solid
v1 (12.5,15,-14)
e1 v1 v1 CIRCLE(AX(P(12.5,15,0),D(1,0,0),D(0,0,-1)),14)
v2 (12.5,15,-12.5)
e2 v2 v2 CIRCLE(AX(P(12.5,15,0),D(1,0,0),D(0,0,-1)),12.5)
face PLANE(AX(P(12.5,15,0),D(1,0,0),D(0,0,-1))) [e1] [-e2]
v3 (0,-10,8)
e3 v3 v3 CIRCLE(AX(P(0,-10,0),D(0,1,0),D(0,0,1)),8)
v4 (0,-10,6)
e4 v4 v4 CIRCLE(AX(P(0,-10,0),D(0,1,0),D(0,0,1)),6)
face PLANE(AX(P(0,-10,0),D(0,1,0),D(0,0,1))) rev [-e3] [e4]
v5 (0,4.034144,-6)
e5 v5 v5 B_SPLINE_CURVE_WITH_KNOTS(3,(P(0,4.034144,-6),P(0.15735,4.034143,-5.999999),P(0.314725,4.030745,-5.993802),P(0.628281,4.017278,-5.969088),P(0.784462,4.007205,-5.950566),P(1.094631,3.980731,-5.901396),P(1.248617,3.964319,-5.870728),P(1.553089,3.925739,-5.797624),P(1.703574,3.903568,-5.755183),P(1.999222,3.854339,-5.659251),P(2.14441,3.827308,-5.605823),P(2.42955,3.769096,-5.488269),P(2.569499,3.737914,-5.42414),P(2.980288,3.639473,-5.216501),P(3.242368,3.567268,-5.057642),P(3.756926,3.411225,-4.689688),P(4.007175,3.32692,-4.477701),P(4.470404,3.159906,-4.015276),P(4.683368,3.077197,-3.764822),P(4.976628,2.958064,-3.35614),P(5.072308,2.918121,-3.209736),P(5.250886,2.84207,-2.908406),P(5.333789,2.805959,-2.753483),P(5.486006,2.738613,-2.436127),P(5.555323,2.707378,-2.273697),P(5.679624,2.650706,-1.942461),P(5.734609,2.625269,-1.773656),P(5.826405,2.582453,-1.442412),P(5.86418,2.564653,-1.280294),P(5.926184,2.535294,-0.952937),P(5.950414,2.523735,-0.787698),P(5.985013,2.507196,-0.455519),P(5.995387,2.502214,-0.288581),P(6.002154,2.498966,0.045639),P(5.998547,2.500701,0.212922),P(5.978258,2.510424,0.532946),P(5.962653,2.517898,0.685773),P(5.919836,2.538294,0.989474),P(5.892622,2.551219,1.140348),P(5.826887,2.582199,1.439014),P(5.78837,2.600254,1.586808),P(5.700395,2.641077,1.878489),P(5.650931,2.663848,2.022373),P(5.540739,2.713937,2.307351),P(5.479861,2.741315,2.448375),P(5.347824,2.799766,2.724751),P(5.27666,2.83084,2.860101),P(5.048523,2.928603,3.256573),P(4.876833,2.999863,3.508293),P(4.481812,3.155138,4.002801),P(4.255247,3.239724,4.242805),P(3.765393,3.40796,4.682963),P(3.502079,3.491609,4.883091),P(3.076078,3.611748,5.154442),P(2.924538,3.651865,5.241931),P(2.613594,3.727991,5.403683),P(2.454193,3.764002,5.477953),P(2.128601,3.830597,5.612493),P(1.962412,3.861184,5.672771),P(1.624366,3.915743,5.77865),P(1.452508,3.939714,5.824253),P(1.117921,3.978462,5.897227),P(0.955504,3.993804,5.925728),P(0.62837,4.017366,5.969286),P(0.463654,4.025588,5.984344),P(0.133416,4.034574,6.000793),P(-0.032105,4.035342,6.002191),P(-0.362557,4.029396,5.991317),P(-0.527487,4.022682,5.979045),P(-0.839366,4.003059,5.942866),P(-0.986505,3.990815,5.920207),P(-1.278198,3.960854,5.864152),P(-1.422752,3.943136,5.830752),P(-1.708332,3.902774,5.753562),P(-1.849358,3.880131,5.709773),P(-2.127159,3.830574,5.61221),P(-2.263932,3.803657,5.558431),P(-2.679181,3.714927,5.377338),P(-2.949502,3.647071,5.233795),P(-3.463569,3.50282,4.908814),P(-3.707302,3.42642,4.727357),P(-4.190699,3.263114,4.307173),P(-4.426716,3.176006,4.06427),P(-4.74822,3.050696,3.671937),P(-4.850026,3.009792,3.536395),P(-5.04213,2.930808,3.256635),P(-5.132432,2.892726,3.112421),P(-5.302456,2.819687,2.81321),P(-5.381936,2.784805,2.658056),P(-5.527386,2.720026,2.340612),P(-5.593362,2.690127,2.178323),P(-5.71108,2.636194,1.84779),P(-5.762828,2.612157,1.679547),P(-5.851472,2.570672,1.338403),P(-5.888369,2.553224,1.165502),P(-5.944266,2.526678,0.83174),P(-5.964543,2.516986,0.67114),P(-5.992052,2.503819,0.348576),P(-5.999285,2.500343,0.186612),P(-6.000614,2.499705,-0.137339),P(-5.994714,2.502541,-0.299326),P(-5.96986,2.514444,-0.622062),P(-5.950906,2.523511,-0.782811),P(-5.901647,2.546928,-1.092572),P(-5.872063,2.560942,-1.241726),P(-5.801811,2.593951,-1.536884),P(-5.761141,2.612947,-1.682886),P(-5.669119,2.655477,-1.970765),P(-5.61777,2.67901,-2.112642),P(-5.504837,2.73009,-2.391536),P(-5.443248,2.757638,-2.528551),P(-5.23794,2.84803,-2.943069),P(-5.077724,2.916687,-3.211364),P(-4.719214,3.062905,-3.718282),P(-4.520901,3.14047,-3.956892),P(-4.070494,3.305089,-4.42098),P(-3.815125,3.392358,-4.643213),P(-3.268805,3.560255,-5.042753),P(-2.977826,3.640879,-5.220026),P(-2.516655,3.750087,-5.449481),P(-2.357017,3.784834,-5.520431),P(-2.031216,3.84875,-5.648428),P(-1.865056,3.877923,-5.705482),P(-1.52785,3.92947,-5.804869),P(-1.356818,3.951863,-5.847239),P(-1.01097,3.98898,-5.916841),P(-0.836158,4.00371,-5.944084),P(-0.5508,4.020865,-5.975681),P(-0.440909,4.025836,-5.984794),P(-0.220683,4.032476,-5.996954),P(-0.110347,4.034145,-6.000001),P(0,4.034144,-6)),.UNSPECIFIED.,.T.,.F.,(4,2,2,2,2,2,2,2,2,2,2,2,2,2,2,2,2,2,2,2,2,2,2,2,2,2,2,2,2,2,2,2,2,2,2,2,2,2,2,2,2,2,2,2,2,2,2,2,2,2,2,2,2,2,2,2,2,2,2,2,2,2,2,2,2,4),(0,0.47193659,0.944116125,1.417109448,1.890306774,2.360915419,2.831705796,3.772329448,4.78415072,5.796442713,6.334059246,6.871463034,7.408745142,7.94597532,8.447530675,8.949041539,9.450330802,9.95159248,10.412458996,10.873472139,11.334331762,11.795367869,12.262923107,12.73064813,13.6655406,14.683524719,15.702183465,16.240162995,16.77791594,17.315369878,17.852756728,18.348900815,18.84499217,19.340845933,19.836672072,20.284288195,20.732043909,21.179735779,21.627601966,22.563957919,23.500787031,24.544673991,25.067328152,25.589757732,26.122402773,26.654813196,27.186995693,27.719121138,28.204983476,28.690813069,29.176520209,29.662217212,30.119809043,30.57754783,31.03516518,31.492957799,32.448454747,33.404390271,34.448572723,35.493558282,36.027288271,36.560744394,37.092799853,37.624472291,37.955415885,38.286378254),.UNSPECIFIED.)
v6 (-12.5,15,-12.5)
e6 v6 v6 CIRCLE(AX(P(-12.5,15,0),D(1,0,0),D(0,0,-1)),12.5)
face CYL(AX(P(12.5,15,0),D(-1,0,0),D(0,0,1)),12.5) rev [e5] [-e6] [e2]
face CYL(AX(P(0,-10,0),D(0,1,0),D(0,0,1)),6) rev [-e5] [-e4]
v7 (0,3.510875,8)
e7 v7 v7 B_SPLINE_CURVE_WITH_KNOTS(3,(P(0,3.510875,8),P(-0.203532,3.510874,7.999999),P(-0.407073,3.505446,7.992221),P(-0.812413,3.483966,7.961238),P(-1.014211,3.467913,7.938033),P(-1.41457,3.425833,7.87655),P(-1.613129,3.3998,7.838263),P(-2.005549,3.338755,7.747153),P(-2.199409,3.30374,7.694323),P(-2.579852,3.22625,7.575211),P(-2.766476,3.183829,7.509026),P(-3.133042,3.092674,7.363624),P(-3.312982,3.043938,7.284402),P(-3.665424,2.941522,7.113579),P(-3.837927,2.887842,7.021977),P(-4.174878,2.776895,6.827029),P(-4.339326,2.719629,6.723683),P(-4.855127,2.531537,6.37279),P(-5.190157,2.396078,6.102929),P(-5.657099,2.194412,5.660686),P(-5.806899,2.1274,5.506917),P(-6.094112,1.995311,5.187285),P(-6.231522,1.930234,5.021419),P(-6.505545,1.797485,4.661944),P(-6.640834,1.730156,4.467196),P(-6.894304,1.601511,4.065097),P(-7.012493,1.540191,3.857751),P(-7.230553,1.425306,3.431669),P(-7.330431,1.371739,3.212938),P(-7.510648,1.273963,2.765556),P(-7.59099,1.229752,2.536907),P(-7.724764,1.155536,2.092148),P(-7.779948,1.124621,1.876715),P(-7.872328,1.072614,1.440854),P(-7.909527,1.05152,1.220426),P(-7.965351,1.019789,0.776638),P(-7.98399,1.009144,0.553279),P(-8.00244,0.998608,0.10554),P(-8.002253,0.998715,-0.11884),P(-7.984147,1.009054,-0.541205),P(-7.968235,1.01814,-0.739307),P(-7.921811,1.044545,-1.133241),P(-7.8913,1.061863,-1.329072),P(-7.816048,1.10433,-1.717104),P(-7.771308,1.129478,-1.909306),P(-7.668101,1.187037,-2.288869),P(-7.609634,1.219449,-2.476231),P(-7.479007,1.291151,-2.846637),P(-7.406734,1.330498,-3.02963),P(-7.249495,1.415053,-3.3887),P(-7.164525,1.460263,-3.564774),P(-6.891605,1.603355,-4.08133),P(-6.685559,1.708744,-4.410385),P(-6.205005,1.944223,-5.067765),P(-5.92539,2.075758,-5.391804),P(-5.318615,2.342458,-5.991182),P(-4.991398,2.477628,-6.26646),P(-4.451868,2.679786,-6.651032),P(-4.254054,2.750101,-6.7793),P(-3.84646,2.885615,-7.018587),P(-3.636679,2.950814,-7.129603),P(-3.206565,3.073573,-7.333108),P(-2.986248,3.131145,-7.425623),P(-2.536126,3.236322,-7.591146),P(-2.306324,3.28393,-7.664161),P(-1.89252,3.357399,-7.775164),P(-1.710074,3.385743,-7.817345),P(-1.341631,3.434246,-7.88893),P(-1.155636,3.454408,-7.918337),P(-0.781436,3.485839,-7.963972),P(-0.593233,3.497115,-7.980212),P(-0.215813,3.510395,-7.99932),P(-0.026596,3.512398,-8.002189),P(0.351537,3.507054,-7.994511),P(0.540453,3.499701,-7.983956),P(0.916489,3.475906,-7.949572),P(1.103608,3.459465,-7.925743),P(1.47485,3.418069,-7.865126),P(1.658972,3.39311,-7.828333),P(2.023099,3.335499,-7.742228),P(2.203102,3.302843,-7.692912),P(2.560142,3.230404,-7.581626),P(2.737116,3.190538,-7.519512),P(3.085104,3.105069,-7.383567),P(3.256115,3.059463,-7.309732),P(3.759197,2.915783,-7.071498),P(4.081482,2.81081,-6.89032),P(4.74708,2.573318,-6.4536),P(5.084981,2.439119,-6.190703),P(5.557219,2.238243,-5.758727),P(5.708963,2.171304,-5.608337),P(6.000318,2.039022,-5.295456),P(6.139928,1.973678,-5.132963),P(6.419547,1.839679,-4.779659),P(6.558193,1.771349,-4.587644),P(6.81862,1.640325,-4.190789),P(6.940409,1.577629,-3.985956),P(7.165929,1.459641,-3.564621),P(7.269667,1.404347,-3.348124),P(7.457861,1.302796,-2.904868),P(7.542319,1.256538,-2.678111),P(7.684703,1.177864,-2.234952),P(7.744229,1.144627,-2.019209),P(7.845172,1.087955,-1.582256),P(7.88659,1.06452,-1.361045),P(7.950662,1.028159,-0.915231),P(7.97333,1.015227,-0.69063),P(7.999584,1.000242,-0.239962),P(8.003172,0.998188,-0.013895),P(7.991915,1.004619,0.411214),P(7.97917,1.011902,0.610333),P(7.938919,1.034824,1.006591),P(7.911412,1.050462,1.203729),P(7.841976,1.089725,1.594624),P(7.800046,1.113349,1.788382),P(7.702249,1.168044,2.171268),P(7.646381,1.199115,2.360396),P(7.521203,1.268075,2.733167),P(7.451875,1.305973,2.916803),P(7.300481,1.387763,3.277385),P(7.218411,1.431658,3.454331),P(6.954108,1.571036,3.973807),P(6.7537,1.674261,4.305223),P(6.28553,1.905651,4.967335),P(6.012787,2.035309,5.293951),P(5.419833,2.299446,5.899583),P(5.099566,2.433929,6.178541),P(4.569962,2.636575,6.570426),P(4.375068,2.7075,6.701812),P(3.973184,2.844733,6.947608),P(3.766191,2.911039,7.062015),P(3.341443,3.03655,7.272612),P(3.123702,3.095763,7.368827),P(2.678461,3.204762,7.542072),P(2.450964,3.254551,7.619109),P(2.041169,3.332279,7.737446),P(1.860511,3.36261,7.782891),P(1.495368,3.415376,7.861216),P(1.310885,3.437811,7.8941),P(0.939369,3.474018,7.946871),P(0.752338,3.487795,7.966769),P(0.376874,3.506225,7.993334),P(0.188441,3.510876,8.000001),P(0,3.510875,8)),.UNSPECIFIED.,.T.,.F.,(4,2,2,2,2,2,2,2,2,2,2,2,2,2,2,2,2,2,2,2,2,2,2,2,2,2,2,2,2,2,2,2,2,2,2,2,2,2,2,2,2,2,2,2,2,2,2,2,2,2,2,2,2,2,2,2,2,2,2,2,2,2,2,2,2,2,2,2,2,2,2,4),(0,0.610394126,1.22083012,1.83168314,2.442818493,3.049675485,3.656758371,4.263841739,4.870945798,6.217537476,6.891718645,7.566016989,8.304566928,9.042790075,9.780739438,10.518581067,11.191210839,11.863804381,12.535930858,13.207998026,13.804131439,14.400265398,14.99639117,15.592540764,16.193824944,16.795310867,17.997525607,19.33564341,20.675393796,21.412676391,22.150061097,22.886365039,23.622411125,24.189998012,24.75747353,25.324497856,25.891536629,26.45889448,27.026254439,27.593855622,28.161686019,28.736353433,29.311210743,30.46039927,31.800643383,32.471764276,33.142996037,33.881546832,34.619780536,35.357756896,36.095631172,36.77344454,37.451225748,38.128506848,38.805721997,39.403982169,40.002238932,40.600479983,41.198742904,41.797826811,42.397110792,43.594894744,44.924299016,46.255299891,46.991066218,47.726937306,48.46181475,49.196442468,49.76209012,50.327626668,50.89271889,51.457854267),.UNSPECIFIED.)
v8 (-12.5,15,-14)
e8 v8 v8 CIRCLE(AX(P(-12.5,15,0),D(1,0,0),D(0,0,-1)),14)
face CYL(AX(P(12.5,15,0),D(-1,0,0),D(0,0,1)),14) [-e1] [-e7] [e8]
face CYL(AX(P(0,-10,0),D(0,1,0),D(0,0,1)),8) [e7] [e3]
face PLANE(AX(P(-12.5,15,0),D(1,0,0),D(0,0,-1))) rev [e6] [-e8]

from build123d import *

# Parameters (mm, degrees)
EXTRUDE_1_DEPTH          = 10
EXTRUDE_1_DEPTH_BACK     = 10
SKETCH_1_R               = 8
SKETCH_1_R_2             = 6
SKETCH_2_R               = 14
SKETCH_2_R_2             = 12.5
EXTRUDE_2_DEPTH          = 12.5
CUT_EXTRUDE_1_DEPTH      = 35.543451059
CUT_EXTRUDE_1_DEPTH_BACK = 35.543451059
SKETCH_3_R               = 12.5
SKETCH_4_R               = 6
CUT_EXTRUDE_2_DEPTH      = 20


with BuildPart() as part:
    # 草图1 → 凸台-拉伸1 (new, two sides: drawn at the far end of the back side and taken through both)
    with BuildSketch(Plane(origin=(0, 0, 0), x_dir=(1, 0, 0), z_dir=(0, 1, 0)).offset(-EXTRUDE_1_DEPTH_BACK)):
        Circle(SKETCH_1_R)
        Circle(SKETCH_1_R_2, mode=Mode.SUBTRACT)
    extrude(amount=EXTRUDE_1_DEPTH + EXTRUDE_1_DEPTH_BACK)

    # 草图2 → 凸台-拉伸2 (add, symmetric)
    with BuildSketch(Plane(origin=(0, 0, 0), x_dir=(0, 0, -1), z_dir=(1, 0, 0))):
        with Locations((0, 15)):
            Circle(SKETCH_2_R)
        with Locations((0, 15)):
            Circle(SKETCH_2_R_2, mode=Mode.SUBTRACT)
    extrude(amount=EXTRUDE_2_DEPTH, both=True)

    # 草图3 → 切除-拉伸1 (cut, two sides: drawn at the far end of the back side and taken through both)
    with BuildSketch(Plane(origin=(0, 0, 0), x_dir=(0, 0, -1), z_dir=(1, 0, 0)).offset(-CUT_EXTRUDE_1_DEPTH_BACK)):
        with Locations((0, 15)):
            Circle(SKETCH_3_R)
    extrude(amount=CUT_EXTRUDE_1_DEPTH + CUT_EXTRUDE_1_DEPTH_BACK, mode=Mode.SUBTRACT)

    # 草图4 → 切除-拉伸2 (cut)
    with BuildSketch(Plane.XZ.offset(10)):
        Circle(SKETCH_4_R)
    extrude(amount=-CUT_EXTRUDE_2_DEPTH, mode=Mode.SUBTRACT)


solid = part.part
